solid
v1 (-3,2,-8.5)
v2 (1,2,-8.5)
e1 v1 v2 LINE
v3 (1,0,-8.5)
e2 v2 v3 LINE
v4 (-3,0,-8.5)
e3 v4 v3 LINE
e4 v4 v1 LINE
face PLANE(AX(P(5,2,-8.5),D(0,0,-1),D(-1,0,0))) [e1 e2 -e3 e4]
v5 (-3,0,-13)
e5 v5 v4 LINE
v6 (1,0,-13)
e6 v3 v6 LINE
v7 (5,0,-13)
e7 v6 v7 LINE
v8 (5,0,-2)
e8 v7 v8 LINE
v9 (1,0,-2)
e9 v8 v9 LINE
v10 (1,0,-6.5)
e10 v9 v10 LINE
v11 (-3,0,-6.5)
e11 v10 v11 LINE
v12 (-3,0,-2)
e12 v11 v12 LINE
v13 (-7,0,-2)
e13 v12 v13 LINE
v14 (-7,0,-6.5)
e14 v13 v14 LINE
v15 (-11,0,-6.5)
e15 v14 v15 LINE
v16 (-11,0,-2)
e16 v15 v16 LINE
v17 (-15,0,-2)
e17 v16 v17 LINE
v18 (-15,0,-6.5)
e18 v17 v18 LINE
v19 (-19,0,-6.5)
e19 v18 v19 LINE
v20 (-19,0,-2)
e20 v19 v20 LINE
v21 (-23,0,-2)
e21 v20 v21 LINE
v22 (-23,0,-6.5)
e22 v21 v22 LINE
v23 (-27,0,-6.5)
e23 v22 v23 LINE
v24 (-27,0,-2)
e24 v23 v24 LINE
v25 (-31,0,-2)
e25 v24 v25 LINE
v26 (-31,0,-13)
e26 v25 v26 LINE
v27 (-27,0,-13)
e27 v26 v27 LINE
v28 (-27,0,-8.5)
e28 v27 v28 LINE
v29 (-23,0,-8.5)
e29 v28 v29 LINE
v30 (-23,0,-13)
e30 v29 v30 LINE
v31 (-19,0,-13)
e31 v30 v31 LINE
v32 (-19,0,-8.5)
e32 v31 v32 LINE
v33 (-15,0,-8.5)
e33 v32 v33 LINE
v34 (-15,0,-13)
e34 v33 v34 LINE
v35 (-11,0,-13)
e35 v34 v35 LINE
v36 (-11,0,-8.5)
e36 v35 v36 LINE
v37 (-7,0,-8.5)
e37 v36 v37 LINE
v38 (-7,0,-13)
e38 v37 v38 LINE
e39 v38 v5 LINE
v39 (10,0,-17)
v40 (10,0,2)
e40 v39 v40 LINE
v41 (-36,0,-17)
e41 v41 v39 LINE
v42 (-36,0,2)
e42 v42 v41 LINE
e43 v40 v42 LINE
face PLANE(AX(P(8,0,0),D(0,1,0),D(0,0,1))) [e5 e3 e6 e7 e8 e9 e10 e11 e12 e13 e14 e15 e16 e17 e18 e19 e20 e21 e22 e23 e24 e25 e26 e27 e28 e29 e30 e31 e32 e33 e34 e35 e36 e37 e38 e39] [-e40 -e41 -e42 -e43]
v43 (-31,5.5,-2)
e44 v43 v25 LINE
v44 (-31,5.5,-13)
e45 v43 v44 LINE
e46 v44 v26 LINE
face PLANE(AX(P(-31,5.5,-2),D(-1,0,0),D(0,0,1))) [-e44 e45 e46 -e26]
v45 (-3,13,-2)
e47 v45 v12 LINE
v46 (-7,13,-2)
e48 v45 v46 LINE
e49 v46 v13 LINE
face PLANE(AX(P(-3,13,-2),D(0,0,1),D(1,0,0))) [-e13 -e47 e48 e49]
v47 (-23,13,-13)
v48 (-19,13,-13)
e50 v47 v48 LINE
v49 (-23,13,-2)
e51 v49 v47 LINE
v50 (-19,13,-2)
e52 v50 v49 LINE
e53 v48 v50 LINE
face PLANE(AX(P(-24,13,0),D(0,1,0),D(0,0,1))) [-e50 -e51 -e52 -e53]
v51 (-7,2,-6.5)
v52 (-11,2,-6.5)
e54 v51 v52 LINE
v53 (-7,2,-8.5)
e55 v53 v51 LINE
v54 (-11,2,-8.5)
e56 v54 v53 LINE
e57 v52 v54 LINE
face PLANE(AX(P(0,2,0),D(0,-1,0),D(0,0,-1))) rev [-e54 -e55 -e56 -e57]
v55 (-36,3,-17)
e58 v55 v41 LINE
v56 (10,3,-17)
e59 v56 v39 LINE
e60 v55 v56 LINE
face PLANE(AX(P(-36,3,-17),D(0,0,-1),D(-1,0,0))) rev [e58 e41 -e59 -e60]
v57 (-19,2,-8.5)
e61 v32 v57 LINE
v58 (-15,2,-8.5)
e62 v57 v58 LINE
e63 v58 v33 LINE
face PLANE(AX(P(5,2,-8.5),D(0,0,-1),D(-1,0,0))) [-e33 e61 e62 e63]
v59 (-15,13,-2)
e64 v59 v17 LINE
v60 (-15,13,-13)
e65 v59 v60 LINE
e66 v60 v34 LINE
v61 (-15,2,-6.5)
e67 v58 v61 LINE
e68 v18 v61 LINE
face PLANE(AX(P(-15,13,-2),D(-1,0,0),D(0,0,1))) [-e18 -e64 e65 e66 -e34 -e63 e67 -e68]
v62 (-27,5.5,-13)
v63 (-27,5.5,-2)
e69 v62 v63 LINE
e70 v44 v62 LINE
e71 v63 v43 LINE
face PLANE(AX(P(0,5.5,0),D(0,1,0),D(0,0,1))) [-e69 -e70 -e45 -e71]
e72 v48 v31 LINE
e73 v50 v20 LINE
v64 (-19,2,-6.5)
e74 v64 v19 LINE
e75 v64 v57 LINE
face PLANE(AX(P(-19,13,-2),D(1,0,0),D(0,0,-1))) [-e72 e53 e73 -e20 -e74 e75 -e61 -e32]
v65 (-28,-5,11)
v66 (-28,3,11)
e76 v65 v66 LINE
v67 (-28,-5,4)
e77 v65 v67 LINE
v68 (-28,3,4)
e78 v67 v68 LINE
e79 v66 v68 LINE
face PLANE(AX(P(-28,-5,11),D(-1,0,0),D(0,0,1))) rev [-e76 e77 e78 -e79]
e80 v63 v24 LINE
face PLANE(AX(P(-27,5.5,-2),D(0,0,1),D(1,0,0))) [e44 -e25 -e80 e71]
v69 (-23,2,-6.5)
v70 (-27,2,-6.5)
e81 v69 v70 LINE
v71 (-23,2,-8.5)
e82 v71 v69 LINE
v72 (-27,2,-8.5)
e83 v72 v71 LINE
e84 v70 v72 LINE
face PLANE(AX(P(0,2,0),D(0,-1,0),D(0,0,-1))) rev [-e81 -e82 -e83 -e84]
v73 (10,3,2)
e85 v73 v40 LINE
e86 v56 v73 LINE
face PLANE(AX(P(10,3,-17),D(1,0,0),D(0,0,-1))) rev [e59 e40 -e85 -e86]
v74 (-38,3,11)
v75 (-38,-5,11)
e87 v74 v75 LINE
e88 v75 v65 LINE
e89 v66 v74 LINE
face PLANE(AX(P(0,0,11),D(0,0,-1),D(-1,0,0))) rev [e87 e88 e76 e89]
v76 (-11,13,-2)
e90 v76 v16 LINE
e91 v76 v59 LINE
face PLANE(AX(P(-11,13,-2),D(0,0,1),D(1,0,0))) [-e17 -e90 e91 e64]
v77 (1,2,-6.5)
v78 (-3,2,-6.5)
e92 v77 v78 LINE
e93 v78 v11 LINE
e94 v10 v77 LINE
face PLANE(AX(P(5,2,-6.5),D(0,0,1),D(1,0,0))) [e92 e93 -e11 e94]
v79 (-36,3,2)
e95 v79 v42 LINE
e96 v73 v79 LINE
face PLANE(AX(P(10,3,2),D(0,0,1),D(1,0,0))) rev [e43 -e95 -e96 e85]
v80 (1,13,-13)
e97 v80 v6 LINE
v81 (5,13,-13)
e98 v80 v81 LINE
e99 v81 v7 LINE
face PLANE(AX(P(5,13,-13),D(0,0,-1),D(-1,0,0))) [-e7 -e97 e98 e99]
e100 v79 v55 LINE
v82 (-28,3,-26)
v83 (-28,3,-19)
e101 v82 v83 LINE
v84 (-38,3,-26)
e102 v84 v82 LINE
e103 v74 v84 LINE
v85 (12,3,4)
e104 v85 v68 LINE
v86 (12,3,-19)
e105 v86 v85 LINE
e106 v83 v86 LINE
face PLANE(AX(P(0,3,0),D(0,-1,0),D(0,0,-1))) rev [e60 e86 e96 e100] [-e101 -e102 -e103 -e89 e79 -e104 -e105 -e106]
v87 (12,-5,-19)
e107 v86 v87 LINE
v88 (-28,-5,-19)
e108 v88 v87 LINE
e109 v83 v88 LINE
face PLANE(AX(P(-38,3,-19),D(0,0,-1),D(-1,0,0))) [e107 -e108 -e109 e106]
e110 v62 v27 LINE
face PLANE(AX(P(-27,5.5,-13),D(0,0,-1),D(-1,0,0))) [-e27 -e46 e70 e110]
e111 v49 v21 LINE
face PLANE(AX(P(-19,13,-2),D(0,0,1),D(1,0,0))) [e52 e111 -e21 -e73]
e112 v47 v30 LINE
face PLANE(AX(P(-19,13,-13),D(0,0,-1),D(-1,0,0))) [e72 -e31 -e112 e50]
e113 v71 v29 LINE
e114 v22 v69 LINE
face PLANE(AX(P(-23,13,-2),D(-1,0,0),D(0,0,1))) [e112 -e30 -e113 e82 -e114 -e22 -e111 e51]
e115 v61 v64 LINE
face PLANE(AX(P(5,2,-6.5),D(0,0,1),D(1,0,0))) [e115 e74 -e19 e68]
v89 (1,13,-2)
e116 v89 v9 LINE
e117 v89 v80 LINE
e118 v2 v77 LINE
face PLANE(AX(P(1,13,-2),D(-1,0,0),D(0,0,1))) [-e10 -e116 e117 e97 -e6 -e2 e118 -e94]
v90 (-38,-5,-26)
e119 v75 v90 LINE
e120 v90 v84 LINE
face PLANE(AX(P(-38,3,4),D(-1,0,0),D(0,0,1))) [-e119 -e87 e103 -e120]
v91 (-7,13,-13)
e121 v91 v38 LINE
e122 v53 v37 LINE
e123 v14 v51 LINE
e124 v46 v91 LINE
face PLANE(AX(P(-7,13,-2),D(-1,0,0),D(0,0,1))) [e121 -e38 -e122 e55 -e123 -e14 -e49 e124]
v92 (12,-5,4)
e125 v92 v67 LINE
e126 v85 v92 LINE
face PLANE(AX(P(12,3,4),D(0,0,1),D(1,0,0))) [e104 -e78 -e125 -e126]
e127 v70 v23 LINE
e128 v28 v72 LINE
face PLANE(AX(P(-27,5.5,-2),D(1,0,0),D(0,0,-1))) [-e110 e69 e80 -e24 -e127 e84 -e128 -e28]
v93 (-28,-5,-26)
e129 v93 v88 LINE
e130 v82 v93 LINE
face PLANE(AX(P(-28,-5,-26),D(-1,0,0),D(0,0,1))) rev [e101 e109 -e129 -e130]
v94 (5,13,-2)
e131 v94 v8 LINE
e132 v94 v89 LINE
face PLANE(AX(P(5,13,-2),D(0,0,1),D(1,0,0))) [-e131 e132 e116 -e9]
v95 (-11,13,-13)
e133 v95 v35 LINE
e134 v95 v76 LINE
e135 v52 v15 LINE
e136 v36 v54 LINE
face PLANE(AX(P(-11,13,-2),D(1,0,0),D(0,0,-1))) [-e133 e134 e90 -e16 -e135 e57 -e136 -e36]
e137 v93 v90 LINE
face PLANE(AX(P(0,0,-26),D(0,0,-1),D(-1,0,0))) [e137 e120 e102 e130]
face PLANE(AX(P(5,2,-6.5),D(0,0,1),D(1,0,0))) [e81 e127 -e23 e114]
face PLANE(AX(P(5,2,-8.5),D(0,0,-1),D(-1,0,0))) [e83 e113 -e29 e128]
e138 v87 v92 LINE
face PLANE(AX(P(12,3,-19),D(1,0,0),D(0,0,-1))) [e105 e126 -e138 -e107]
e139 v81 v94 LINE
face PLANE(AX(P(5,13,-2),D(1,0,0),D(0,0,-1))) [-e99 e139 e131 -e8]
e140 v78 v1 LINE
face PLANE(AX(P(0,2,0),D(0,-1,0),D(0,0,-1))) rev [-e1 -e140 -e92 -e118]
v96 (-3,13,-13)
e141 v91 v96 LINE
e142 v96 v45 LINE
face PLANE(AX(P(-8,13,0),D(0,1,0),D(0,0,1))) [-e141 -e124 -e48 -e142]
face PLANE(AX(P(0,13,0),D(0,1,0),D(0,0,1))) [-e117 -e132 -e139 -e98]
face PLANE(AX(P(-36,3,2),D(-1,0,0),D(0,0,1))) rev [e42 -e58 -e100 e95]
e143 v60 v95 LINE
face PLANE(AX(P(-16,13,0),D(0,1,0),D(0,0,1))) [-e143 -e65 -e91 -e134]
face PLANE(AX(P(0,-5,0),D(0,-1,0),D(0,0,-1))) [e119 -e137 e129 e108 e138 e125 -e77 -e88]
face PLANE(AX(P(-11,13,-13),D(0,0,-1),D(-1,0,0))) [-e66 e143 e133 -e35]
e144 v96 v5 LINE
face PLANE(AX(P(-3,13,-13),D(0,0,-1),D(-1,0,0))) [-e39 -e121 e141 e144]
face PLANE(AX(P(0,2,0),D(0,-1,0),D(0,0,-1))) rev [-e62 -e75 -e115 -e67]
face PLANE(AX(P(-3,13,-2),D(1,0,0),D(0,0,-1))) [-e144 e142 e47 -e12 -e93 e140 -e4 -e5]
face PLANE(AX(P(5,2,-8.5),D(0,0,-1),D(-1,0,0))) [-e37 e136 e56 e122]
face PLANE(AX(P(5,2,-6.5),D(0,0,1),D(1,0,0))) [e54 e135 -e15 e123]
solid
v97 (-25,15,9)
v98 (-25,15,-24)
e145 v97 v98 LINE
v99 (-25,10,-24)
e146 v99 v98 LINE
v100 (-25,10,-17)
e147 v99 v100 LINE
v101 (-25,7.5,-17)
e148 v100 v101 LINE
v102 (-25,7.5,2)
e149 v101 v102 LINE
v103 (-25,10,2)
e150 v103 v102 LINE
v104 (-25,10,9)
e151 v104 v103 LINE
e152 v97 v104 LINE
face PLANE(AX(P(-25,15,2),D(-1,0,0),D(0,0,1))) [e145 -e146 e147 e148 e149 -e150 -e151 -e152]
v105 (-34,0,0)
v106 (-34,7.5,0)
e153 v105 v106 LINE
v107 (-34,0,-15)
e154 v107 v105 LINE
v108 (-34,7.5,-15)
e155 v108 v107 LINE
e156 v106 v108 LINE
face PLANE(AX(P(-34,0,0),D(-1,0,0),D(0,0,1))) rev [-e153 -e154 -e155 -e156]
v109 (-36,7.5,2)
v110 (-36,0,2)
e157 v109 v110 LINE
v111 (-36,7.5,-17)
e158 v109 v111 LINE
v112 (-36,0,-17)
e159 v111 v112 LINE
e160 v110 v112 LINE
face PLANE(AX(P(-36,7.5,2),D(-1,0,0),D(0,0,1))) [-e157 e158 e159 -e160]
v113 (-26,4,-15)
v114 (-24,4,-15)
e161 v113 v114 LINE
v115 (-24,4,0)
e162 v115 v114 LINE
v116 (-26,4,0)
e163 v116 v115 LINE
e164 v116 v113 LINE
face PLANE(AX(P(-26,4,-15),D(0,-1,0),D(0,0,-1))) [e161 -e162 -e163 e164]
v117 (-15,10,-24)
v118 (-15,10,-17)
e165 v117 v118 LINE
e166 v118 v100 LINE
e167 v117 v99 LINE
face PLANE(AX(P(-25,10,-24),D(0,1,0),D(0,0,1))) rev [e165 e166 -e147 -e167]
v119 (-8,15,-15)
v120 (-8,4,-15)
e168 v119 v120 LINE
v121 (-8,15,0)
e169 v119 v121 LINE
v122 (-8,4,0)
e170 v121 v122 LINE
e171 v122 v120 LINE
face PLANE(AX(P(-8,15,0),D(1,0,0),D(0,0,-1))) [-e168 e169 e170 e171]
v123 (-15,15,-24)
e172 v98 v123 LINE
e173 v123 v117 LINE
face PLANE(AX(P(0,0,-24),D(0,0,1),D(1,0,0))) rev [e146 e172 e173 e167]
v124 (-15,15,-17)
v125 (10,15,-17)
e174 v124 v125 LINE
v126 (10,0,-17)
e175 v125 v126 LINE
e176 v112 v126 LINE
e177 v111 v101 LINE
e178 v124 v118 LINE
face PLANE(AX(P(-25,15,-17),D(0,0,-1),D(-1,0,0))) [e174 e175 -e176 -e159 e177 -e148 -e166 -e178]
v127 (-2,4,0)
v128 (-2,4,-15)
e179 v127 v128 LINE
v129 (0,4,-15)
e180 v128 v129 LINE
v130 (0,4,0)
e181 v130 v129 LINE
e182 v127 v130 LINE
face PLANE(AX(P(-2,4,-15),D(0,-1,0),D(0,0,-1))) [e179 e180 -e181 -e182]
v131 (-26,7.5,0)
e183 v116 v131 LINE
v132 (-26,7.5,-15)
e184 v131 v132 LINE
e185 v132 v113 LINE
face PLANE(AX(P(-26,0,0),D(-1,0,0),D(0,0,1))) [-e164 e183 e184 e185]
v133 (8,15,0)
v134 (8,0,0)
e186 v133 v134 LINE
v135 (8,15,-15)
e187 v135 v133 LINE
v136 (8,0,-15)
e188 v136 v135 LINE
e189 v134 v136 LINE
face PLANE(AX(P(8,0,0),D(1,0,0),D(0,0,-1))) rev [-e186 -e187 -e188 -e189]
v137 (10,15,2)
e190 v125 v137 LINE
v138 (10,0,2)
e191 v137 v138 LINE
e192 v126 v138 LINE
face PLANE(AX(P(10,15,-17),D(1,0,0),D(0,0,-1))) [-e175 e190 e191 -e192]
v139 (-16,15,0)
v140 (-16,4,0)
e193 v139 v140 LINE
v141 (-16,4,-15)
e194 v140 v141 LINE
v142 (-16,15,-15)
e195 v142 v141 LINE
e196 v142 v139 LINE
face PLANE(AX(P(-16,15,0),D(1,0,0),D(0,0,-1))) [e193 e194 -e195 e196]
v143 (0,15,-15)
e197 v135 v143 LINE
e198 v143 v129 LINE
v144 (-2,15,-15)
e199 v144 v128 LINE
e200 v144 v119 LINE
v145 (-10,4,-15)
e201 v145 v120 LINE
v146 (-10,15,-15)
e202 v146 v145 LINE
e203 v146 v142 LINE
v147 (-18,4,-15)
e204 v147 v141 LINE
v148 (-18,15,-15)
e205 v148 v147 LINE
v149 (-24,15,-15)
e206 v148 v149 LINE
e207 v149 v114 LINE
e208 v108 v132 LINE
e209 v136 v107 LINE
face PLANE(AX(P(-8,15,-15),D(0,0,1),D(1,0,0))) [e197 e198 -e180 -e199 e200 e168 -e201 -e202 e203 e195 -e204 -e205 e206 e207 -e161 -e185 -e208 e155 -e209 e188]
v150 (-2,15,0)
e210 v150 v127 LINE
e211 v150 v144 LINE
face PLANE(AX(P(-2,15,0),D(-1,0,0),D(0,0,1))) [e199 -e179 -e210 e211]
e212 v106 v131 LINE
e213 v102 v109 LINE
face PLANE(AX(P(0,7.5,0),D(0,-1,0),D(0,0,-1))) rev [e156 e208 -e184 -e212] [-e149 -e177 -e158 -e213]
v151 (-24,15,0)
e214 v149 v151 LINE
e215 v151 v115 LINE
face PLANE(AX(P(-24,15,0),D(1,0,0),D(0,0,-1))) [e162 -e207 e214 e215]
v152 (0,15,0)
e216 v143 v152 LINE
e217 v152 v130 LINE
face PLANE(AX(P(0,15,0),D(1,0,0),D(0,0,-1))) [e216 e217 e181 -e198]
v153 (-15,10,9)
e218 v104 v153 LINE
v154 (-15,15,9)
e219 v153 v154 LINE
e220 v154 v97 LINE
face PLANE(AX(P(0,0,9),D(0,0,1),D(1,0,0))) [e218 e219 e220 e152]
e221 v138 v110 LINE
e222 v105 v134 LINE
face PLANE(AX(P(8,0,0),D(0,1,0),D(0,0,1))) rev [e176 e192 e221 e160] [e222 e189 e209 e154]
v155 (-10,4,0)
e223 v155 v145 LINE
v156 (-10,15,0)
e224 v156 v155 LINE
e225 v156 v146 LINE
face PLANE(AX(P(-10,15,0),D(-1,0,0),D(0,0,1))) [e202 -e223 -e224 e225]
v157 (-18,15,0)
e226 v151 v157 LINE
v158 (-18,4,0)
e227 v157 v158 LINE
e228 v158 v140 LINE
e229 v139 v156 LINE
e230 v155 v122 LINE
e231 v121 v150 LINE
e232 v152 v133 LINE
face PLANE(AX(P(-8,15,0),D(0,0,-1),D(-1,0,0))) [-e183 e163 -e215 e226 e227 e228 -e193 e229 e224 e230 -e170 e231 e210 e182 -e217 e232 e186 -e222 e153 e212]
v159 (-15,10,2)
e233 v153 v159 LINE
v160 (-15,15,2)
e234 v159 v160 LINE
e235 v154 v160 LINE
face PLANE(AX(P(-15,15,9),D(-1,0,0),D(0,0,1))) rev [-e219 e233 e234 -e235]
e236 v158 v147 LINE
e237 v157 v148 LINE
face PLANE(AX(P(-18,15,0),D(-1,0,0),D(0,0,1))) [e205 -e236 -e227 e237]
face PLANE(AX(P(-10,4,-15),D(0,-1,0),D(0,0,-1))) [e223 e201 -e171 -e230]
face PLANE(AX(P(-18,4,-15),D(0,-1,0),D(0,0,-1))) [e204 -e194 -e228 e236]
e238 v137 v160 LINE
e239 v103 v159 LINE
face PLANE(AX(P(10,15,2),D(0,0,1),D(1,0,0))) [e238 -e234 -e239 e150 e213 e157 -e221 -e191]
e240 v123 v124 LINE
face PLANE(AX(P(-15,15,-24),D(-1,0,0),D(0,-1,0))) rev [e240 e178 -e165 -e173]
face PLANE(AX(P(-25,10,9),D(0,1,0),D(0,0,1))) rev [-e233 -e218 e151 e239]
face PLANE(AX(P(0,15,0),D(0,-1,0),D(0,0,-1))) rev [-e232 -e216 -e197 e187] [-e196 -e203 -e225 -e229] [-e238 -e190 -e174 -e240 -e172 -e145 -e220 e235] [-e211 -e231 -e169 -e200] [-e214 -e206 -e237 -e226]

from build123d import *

# Parameters (mm, degrees)
SKETCH1_W                = 6
SKETCH1_H                = 15
BOSS_EXTRUDE1_DEPTH      = 15
SKETCH2_W                = 4
SKETCH2_H                = 11
CUT_EXTRUDE1_DEPTH       = 13
SKETCH3_W                = 15
SKETCH3_H                = 4
BOSS_EXTRUDE2_DEPTH      = 2
LPATTERN1_COUNT          = 4
LPATTERN1_PITCH          = 8
SKETCH4_W                = 15
SKETCH4_H                = 7.5
BOSS_EXTRUDE3_DEPTH      = 8
SKETCH5_W                = 4
SKETCH5_H                = 11
CUT_EXTRUDE2_DEPTH       = 5.5
SKETCH6_W                = 15
SKETCH6_H                = 15
BOSS_EXTRUDE4_DEPTH      = 2
SKETCH7_W                = 36
SKETCH7_H                = 2
CUT_EXTRUDE3_DEPTH       = 2
BOSS_EXTRUDE5_DEPTH      = 5
BOSS_EXTRUDE5_DEPTH_BACK = 15
SKETCH8_W                = 35
SKETCH8_H                = 19
BOSS_EXTRUDE6_DEPTH      = 5
BOSS_EXTRUDE6_DEPTH_BACK = 7.5
SKETCH9_W                = 11
SKETCH9_H                = 19
SPLIT1_START             = -5
SPLIT1_OUTLINE_W         = 46
SPLIT1_OUTLINE_H         = 19
SPLIT1_DEPTH             = 5
SPLIT1_2_OUTLINE_W       = 4
SPLIT1_2_OUTLINE_H       = 11
SPLIT1_2_DEPTH           = 13
SPLIT1_3_OUTLINE_W       = 4
SPLIT1_3_OUTLINE_H       = 2
SPLIT1_3_DEPTH           = 2
SPLIT1_START_2           = -13
SPLIT1_4_DEPTH           = 11
SPLIT1_START_3           = -17
SPLIT1_5_OUTLINE_W       = 46
SPLIT1_5_OUTLINE_H       = 5
SPLIT1_5_DEPTH           = 19
SPLIT1_START_4           = -8.5
SPLIT1_6_OUTLINE_W       = 4
SPLIT1_6_OUTLINE_H       = 2
SPLIT1_6_DEPTH           = 2
SKETCH15_W               = 10
SKETCH15_H               = 5
BOSS_EXTRUDE13_DEPTH     = 7
SKETCH16_W               = 10
SKETCH16_H               = 5
BOSS_EXTRUDE14_DEPTH     = 7
SKETCH17_W               = 50
SKETCH17_H               = 23
SKETCH17_W_2             = 46
SKETCH17_H_2             = 19
BOSS_EXTRUDE15_DEPTH     = 8
SKETCH18_W               = 10
SKETCH18_H               = 8
BOSS_EXTRUDE16_DEPTH     = 7
SKETCH19_W               = 10
SKETCH19_H               = 8
BOSS_EXTRUDE17_DEPTH     = 7


# Read off the part's stored shape, not the designer's step: Split1
with BuildPart() as part:
    # Sketch1 → Boss-Extrude1 (new body)
    with BuildSketch(Plane(origin=(0, 0, 0), x_dir=(1, 0, 0), z_dir=(0, 1, 0))):
        with Locations((3, 7.5)):
            Rectangle(SKETCH1_W, SKETCH1_H)
    extrude(amount=BOSS_EXTRUDE1_DEPTH)

    # Sketch2 → Cut-Extrude1 (cut)
    with BuildSketch(Plane.XZ):
        with Locations((3, -7.5)):
            Rectangle(SKETCH2_W, SKETCH2_H)
    extrude(amount=-CUT_EXTRUDE1_DEPTH, mode=Mode.SUBTRACT)

    # Sketch3 → Boss-Extrude2 (add)
    with BuildSketch(Plane.ZY):
        with Locations((-7.5, 2)):
            Rectangle(SKETCH3_W, SKETCH3_H)
    extrude(amount=BOSS_EXTRUDE2_DEPTH)


with BuildPart() as lpattern1_1:
    # LPattern1: pattern copy
    add(part.part.moved(Location(Vector(-1, 0, 0) * (1 * LPATTERN1_PITCH))))


with BuildPart() as lpattern1_2:
    # LPattern1: pattern copy
    add(part.part.moved(Location(Vector(-1, 0, 0) * (2 * LPATTERN1_PITCH))))


with BuildPart() as lpattern1_3:
    # LPattern1: pattern copy
    add(part.part.moved(Location(Vector(-1, 0, 0) * (3 * LPATTERN1_PITCH))))

    # Sketch4 → Boss-Extrude3 (add)
    with BuildSketch(Plane.ZY.offset(26)):
        with Locations((-7.5, 3.75)):
            Rectangle(SKETCH4_W, SKETCH4_H)
    extrude(amount=BOSS_EXTRUDE3_DEPTH)

    # Sketch5 → Cut-Extrude2 (cut)
    with BuildSketch(Plane.XZ):
        with Locations((-29, -7.5)):
            Rectangle(SKETCH5_W, SKETCH5_H)
    extrude(amount=-CUT_EXTRUDE2_DEPTH, mode=Mode.SUBTRACT)


with BuildPart() as lpattern1_1_1:
    add(lpattern1_1.part)

    # Combine1: union LPattern1_2, LPattern1_3, part
    add(lpattern1_2.part)
    add(lpattern1_3.part)
    add(part.part)

    # Sketch6 → Boss-Extrude4 (add)
    with BuildSketch(Plane(origin=(6, 0, 0), x_dir=(0, 0, -1), z_dir=(1, 0, 0))):
        with Locations((7.5, 7.5)):
            Rectangle(SKETCH6_W, SKETCH6_H)
    extrude(amount=BOSS_EXTRUDE4_DEPTH)

    # Sketch7 → Cut-Extrude3 (cut)
    with BuildSketch(Plane.XZ):
        with Locations((-13, -7.5)):
            Rectangle(SKETCH7_W, SKETCH7_H)
    extrude(amount=-CUT_EXTRUDE3_DEPTH, mode=Mode.SUBTRACT)


with BuildPart() as body_2:
    # Sketch8 → Boss-Extrude5 (new, two sides: drawn at the far end of the back side and taken through both)
    with BuildSketch(Plane.XZ.offset(-BOSS_EXTRUDE5_DEPTH_BACK)):
        with Locations((-7.5, -7.5)):
            Rectangle(SKETCH8_W, SKETCH8_H)
    extrude(amount=BOSS_EXTRUDE5_DEPTH + BOSS_EXTRUDE5_DEPTH_BACK)


with BuildPart() as body_3:
    # Sketch9 → Boss-Extrude6 (new, two sides: drawn at the far end of the back side and taken through both)
    with BuildSketch(Plane.XZ.offset(-BOSS_EXTRUDE6_DEPTH_BACK)):
        with Locations((-30.5, -7.5)):
            Rectangle(SKETCH9_W, SKETCH9_H)
    extrude(amount=BOSS_EXTRUDE6_DEPTH + BOSS_EXTRUDE6_DEPTH_BACK)


with BuildPart() as body_2_1:
    add(body_2.part)

    # Combine3: union body 3
    add(body_3.part)

    # Combine4: cut LPattern1_1
    add(lpattern1_1_1.part, mode=Mode.SUBTRACT)

    # Split1 outline → Split1 (cut)
    with BuildSketch(Plane(origin=(0, 0, 0), x_dir=(1, 0, 0), z_dir=(0, 1, 0)).offset(SPLIT1_START)):
        with Locations((-13, 7.5)):
            Rectangle(SPLIT1_OUTLINE_W, SPLIT1_OUTLINE_H)
    extrude(amount=SPLIT1_DEPTH, mode=Mode.SUBTRACT)

    # Split1 2 outline → Split1 2 (cut)
    with BuildSketch(Plane(origin=(0, 0, 0), x_dir=(1, 0, 0), z_dir=(0, 1, 0))):
        with Locations((-5, 7.5)):
            Rectangle(SPLIT1_2_OUTLINE_W, SPLIT1_2_OUTLINE_H)
        with Locations((3, 7.5)):
            Rectangle(SPLIT1_2_OUTLINE_W, SPLIT1_2_OUTLINE_H)
        with Locations((-13, 7.5)):
            Rectangle(SPLIT1_2_OUTLINE_W, SPLIT1_2_OUTLINE_H)
        with Locations((-21, 7.5)):
            Rectangle(SPLIT1_2_OUTLINE_W, SPLIT1_2_OUTLINE_H)
        with Locations((-29, 7.5)):
            Rectangle(SPLIT1_2_OUTLINE_W, SPLIT1_2_OUTLINE_H)
    extrude(amount=SPLIT1_2_DEPTH, mode=Mode.SUBTRACT)

    # Split1 3 outline → Split1 3 (cut)
    with BuildSketch(Plane(origin=(0, 0, 0), x_dir=(1, 0, 0), z_dir=(0, 1, 0))):
        with Locations((-1, 7.5)):
            Rectangle(SPLIT1_3_OUTLINE_W, SPLIT1_3_OUTLINE_H)
        with Locations((-9, 7.5)):
            Rectangle(SPLIT1_3_OUTLINE_W, SPLIT1_3_OUTLINE_H)
        with Locations((-17, 7.5)):
            Rectangle(SPLIT1_3_OUTLINE_W, SPLIT1_3_OUTLINE_H)
        with Locations((-25, 7.5)):
            Rectangle(SPLIT1_3_OUTLINE_W, SPLIT1_3_OUTLINE_H)
    extrude(amount=SPLIT1_3_DEPTH, mode=Mode.SUBTRACT)

    # Sketch15 → Boss-Extrude13 (add)
    with BuildSketch(Plane.XY.offset(2)):
        with Locations((-20, 12.5)):
            Rectangle(SKETCH15_W, SKETCH15_H)
    extrude(amount=BOSS_EXTRUDE13_DEPTH)

    # Sketch16 → Boss-Extrude14 (add)
    with BuildSketch(Plane(origin=(0, 0, -17), x_dir=(-1, 0, 0), z_dir=(0, 0, -1))):
        with Locations((20, 12.5)):
            Rectangle(SKETCH16_W, SKETCH16_H)
    extrude(amount=BOSS_EXTRUDE14_DEPTH)


with BuildPart() as body_2_2:
    # Split1 4 outline → Split1 4 (new body)
    with BuildSketch(Plane.XY.offset(SPLIT1_START_2)):
        Polygon((-27, 5.5), (-31, 5.5), (-31, 0), (-36, 0), (-36, -5), (10, -5), (10, 0), (5, 0), (5, 13), (1, 13), (1, 0), (-3, 0), (-3, 13), (-7, 13), (-7, 0), (-11, 0), (-11, 13), (-15, 13), (-15, 0), (-19, 0), (-19, 13), (-23, 13), (-23, 0), (-27, 0), align=None)
    extrude(amount=SPLIT1_4_DEPTH)

    # Split1 5 outline → Split1 5 (add)
    with BuildSketch(Plane.XY.offset(SPLIT1_START_3)):
        with Locations((-13, -2.5)):
            Rectangle(SPLIT1_5_OUTLINE_W, SPLIT1_5_OUTLINE_H)
    extrude(amount=SPLIT1_5_DEPTH)

    # Split1 6 outline → Split1 6 (add)
    with BuildSketch(Plane.XY.offset(SPLIT1_START_4)):
        with Locations((-25, 1)):
            Rectangle(SPLIT1_6_OUTLINE_W, SPLIT1_6_OUTLINE_H)
        with Locations((-17, 1)):
            Rectangle(SPLIT1_6_OUTLINE_W, SPLIT1_6_OUTLINE_H)
        with Locations((-9, 1)):
            Rectangle(SPLIT1_6_OUTLINE_W, SPLIT1_6_OUTLINE_H)
        with Locations((-1, 1)):
            Rectangle(SPLIT1_6_OUTLINE_W, SPLIT1_6_OUTLINE_H)
    extrude(amount=SPLIT1_6_DEPTH)

    # Sketch17 → Boss-Extrude15 (add)
    with BuildSketch(Plane.XZ.offset(5)):
        with Locations((-13, -7.5)):
            Rectangle(SKETCH17_W, SKETCH17_H)
        with Locations((-13, -7.5)):
            Rectangle(SKETCH17_W_2, SKETCH17_H_2, mode=Mode.SUBTRACT)
    extrude(amount=-BOSS_EXTRUDE15_DEPTH)

    # Sketch18 → Boss-Extrude16 (add)
    with BuildSketch(Plane.XY.offset(4)):
        with Locations((-33, -1)):
            Rectangle(SKETCH18_W, SKETCH18_H)
    extrude(amount=BOSS_EXTRUDE16_DEPTH)

    # Sketch19 → Boss-Extrude17 (add)
    with BuildSketch(Plane(origin=(0, 0, -19), x_dir=(-1, 0, 0), z_dir=(0, 0, -1))):
        with Locations((33, -1)):
            Rectangle(SKETCH19_W, SKETCH19_H)
    extrude(amount=BOSS_EXTRUDE17_DEPTH)


solid = Compound([body_2_1.part, body_2_2.part])
